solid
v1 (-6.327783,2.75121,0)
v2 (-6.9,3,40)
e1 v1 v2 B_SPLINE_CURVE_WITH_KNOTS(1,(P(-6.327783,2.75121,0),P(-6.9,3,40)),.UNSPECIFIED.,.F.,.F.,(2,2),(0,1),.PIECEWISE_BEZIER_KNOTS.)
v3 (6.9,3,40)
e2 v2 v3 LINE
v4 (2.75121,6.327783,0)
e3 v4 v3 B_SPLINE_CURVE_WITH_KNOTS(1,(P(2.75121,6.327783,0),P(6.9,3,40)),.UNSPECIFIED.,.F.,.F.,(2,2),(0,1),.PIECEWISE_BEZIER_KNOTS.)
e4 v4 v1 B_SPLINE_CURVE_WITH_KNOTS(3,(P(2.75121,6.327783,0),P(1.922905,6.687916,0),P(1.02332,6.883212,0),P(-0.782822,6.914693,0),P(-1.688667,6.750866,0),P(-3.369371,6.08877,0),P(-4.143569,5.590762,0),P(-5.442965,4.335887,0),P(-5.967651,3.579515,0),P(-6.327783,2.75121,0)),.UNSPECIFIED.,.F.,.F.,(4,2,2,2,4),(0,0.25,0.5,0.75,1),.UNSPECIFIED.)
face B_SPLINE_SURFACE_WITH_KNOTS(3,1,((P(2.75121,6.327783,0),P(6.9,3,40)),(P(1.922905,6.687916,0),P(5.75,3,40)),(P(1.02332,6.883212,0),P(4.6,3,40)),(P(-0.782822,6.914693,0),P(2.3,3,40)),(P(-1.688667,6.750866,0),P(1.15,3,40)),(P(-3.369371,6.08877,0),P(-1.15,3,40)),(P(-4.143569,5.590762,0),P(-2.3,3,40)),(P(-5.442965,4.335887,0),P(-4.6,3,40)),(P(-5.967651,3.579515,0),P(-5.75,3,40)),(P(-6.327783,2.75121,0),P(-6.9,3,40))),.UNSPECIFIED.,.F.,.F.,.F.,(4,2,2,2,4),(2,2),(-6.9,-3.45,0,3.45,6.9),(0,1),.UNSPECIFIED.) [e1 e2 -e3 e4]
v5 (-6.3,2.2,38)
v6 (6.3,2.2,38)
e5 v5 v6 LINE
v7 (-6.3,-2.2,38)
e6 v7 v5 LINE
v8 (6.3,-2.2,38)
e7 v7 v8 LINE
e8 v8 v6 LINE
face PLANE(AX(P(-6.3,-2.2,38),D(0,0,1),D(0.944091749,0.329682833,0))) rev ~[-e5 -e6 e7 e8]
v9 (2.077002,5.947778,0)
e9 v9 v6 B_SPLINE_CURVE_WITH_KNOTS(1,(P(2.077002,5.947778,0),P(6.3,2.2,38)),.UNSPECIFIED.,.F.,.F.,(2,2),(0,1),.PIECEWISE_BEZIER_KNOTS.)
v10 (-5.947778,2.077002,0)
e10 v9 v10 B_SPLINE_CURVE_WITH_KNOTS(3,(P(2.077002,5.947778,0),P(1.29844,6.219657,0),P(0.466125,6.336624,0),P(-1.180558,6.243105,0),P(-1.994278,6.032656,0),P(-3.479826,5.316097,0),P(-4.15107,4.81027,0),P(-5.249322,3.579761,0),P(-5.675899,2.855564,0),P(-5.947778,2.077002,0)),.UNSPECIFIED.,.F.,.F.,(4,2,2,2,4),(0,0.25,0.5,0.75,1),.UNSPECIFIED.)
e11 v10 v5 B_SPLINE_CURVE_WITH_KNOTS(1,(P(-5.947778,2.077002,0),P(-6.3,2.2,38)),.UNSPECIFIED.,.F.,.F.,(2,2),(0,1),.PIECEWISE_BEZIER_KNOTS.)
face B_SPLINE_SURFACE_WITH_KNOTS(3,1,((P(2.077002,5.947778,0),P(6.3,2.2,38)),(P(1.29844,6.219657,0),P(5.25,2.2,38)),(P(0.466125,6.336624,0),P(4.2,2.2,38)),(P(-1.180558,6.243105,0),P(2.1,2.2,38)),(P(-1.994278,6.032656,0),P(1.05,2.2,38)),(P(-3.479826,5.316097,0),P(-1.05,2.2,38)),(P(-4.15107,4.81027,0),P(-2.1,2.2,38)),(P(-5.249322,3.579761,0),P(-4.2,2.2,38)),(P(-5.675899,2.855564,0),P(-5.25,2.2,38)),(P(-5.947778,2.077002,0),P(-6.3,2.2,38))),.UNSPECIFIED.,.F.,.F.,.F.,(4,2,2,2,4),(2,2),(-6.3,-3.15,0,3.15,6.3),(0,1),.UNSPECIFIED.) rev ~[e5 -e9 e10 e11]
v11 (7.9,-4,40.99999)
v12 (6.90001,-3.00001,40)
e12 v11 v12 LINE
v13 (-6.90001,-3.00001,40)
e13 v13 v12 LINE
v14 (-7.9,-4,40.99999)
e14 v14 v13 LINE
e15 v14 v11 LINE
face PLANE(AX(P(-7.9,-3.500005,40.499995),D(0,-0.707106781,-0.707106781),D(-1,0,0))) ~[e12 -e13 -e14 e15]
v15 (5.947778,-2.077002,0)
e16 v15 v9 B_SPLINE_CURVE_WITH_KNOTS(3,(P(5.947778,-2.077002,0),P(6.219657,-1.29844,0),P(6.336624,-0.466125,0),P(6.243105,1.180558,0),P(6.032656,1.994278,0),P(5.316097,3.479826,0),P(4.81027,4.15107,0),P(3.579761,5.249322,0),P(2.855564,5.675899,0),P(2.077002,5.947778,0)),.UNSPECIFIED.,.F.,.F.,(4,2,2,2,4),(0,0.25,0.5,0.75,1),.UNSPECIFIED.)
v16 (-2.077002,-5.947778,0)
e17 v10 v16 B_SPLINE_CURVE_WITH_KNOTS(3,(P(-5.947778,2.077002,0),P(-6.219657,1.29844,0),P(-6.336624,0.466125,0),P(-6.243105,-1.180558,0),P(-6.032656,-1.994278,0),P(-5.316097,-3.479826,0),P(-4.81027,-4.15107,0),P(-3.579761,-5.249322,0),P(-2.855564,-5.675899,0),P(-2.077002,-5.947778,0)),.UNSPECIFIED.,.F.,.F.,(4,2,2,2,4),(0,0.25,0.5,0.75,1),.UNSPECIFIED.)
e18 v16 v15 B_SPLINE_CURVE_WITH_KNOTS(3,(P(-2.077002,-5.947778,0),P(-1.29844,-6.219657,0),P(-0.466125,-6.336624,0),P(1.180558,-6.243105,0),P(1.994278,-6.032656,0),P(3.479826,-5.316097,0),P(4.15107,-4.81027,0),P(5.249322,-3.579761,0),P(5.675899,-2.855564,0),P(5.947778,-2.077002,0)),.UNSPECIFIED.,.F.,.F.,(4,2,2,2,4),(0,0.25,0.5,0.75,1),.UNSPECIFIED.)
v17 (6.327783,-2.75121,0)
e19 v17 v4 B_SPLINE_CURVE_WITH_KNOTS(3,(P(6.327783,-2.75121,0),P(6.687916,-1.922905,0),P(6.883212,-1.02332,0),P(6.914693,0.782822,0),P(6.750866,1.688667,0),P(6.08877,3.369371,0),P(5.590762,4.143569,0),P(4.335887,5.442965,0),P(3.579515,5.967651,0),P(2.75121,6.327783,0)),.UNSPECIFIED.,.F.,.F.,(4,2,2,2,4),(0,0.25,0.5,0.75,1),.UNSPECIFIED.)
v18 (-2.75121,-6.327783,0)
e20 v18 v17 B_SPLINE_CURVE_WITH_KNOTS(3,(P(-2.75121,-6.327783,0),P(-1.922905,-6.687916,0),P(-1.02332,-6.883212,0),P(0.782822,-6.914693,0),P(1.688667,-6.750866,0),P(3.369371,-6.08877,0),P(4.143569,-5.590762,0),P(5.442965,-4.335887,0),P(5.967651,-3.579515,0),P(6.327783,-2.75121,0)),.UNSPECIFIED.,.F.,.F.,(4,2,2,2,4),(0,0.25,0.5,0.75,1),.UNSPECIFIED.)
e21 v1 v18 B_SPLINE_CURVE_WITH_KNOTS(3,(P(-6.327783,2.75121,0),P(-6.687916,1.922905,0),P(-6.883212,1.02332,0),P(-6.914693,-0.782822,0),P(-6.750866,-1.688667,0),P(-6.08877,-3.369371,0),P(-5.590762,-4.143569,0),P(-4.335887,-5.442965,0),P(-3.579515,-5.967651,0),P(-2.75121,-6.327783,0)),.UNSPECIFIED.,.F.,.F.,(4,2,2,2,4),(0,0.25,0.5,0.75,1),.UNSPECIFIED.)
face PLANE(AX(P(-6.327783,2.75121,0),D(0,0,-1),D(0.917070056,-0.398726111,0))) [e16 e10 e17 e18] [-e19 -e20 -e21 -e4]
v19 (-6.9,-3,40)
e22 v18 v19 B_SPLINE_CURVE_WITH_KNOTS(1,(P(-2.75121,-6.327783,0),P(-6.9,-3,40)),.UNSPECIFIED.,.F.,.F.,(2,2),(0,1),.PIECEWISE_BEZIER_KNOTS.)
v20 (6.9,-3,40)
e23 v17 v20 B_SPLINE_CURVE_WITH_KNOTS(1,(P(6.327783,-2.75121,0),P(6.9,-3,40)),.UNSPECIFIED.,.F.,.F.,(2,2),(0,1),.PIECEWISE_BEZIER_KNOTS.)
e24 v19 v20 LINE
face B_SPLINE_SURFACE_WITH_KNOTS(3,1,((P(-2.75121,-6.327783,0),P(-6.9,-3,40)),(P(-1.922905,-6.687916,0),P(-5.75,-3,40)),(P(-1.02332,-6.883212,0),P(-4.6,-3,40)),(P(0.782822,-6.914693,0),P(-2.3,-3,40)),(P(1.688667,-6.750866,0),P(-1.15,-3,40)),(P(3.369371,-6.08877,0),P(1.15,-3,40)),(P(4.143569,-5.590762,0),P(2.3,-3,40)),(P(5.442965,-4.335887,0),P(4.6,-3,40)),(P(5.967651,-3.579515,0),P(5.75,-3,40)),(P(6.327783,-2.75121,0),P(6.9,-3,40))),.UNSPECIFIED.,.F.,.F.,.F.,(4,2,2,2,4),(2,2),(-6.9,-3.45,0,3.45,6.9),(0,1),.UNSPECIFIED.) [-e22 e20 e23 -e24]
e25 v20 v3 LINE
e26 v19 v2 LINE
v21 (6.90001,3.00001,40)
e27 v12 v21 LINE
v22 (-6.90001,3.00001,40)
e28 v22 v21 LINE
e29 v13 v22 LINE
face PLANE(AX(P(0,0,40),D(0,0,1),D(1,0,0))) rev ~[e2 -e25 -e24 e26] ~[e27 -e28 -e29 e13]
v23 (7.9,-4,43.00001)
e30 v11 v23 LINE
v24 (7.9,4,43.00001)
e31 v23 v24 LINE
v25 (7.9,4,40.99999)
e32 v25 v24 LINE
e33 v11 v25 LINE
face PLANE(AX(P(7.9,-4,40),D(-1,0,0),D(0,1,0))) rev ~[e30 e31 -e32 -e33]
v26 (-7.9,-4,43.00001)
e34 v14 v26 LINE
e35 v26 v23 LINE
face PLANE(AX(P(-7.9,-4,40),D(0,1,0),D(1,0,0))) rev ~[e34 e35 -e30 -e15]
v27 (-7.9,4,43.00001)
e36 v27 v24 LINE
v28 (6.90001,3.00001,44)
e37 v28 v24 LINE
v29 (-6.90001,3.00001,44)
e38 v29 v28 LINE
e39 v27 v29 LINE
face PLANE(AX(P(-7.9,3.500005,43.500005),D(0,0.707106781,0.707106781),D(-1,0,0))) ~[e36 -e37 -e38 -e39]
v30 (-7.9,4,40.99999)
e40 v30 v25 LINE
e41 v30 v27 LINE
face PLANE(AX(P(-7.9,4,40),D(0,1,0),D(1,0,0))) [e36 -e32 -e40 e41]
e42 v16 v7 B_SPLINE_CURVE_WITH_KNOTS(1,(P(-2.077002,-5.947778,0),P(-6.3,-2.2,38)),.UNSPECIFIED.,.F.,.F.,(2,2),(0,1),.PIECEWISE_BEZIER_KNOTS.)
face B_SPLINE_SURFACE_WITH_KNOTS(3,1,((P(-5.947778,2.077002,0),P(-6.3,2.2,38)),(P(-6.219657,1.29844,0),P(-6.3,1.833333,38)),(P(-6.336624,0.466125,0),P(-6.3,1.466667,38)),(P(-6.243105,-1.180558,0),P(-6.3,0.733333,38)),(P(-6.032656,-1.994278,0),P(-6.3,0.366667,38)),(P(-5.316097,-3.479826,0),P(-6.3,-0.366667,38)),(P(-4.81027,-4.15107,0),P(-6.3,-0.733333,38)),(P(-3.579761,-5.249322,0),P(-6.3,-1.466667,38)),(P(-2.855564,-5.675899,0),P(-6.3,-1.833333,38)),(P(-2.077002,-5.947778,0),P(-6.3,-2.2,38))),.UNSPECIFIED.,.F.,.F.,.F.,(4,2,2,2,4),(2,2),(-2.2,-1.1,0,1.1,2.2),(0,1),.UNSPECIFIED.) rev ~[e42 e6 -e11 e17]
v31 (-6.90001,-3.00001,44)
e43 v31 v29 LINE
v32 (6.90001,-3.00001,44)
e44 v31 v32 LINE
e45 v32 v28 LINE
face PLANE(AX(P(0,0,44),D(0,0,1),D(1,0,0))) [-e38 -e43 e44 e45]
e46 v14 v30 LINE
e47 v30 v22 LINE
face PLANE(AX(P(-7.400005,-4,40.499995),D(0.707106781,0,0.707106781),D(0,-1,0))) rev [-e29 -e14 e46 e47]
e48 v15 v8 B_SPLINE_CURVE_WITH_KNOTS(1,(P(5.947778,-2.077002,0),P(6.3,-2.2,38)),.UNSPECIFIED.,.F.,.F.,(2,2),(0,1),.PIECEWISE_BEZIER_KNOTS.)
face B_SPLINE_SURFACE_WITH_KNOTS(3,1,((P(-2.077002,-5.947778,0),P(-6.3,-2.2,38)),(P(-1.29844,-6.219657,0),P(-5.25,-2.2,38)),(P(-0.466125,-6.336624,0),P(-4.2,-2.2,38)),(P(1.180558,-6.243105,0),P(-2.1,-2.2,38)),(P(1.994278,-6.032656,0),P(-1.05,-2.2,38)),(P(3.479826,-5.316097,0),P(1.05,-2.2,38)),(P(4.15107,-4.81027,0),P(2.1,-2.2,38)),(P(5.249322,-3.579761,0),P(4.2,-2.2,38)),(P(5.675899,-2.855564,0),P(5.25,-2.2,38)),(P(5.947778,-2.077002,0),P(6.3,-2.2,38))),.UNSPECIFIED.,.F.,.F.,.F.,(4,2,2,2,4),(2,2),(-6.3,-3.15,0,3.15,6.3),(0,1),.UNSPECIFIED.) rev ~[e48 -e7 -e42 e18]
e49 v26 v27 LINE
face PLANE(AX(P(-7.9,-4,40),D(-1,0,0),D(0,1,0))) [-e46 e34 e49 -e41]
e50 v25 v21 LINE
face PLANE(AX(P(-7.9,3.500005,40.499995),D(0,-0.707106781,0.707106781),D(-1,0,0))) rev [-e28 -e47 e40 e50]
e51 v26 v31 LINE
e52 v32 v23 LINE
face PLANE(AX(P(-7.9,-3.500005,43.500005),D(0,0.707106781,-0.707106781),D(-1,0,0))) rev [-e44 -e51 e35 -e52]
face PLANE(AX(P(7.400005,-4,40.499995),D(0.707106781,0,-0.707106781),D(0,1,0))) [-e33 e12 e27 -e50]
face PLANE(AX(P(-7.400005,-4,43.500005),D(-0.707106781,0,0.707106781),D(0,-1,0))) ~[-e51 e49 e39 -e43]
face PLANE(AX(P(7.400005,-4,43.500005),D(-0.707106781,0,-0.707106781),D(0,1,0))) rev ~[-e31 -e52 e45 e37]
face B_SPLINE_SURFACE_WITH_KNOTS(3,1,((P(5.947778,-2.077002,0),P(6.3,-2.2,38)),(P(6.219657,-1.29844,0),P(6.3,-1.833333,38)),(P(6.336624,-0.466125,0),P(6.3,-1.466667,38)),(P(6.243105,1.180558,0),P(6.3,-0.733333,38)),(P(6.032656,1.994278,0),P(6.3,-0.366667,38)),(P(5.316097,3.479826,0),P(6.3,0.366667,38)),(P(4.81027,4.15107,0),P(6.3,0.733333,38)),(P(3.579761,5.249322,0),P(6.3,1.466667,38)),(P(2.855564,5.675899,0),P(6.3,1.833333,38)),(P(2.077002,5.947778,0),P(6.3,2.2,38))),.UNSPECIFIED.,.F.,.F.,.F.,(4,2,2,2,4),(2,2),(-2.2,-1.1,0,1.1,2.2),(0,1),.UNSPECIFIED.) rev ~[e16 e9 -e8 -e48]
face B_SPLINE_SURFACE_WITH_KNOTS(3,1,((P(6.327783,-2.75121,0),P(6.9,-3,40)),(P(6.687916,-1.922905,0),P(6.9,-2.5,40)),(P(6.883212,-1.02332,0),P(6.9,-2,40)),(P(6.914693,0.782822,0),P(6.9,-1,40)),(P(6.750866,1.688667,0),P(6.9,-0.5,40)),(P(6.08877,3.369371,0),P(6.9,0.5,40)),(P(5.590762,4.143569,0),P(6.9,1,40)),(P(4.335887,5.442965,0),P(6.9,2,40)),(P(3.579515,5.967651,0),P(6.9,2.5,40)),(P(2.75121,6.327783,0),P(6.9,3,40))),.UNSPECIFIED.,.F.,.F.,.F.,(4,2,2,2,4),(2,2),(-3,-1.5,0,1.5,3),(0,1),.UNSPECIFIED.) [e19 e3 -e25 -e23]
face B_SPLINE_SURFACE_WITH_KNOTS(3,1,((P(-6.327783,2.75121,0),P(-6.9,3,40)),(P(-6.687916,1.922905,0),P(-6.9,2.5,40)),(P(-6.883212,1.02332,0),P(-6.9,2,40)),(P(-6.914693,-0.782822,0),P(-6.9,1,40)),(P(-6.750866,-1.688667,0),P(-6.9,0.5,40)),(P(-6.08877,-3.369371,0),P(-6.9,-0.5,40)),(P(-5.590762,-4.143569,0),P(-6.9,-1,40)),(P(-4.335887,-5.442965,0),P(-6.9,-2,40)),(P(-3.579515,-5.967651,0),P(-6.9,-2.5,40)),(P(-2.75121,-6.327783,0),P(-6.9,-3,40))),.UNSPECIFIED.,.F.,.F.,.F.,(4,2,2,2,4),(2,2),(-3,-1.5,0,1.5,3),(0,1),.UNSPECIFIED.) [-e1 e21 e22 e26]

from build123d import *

# Parameters (mm, degrees)
F2_W     = 13.8
F2_H     = 6
F6_W     = 12.6
F6_H     = 4.4
F8_W     = 15.8
F8_H     = 8
F9_DEPTH = 4
F10_SIZE = 0.99999


# Not quite as in the source:
# - a fillet or chamfer is up to 0.001 mm smaller than in the source, because OpenCascade refuses the exact size
# - the arcs of a loft's sections are written as splines that run evenly, so that the points pair up as in the source's solid


with BuildPart() as f3:
    # F0 (on Top) → F3 section 0
    with BuildSketch(Plane.XY):
        with BuildLine():
            add(Edge.make_bspline(
                [(-6.3277833881, 2.7512101688), (-6.6879159571, 1.9229052602), (-6.883211565, 1.0233196176), (-6.914692653, -0.782821821), (-6.7508657466, -1.6886669775), (-6.0887700743, -3.3693713762), (-5.5907618149, -4.143569333), (-4.3358874467, -5.4429646828), (-3.5795150773, -5.9676508192), (-2.7512101688, -6.3277833881)],
                knots=[0, 0, 0, 0, 0.25, 0.25, 0.5, 0.5, 0.75, 0.75, 1, 1, 1, 1], degree=3))
            add(Edge.make_bspline(
                [(-2.7512101688, -6.3277833881), (-1.9229052602, -6.6879159571), (-1.0233196176, -6.883211565), (0.782821821, -6.914692653), (1.6886669775, -6.7508657466), (3.3693713762, -6.0887700743), (4.143569333, -5.5907618149), (5.4429646828, -4.3358874467), (5.9676508192, -3.5795150773), (6.3277833881, -2.7512101688)],
                knots=[0, 0, 0, 0, 0.25, 0.25, 0.5, 0.5, 0.75, 0.75, 1, 1, 1, 1], degree=3))
            add(Edge.make_bspline(
                [(6.3277833881, -2.7512101688), (6.6879159571, -1.9229052602), (6.883211565, -1.0233196176), (6.914692653, 0.782821821), (6.7508657466, 1.6886669775), (6.0887700743, 3.3693713762), (5.5907618149, 4.143569333), (4.3358874467, 5.4429646828), (3.5795150773, 5.9676508192), (2.7512101688, 6.3277833881)],
                knots=[0, 0, 0, 0, 0.25, 0.25, 0.5, 0.5, 0.75, 0.75, 1, 1, 1, 1], degree=3))
            add(Edge.make_bspline(
                [(2.7512101688, 6.3277833881), (1.9229052602, 6.6879159571), (1.0233196176, 6.883211565), (-0.782821821, 6.914692653), (-1.6886669775, 6.7508657466), (-3.3693713762, 6.0887700743), (-4.143569333, 5.5907618149), (-5.4429646828, 4.3358874467), (-5.9676508192, 3.5795150773), (-6.3277833881, 2.7512101688)],
                knots=[0, 0, 0, 0, 0.25, 0.25, 0.5, 0.5, 0.75, 0.75, 1, 1, 1, 1], degree=3))
        make_face()
    # F2 (on offset) → F3 section 1
    with BuildSketch(Plane.XY.offset(40)):
        Rectangle(F2_W, F2_H)
    loft(ruled=True)

    # F5 (on Top) → F7 section 0
    with BuildSketch(Plane.XY):
        with BuildLine():
            add(Edge.make_bspline(
                [(-5.947778016, 2.0770018469), (-6.219656922, 1.2984395252), (-6.3366241137, 0.4661247359), (-6.2431050237, -1.1805579575), (-6.0326555377, -1.9942779624), (-5.3160969794, -3.479826193), (-4.8102698423, -4.151069919), (-3.5797613606, -5.2493224353), (-2.8555641686, -5.6758991101), (-2.0770018469, -5.947778016)],
                knots=[0, 0, 0, 0, 0.25, 0.25, 0.5, 0.5, 0.75, 0.75, 1, 1, 1, 1], degree=3))
            add(Edge.make_bspline(
                [(-2.0770018469, -5.947778016), (-1.2984395252, -6.219656922), (-0.4661247359, -6.3366241137), (1.1805579575, -6.2431050237), (1.9942779624, -6.0326555377), (3.479826193, -5.3160969794), (4.151069919, -4.8102698423), (5.2493224353, -3.5797613606), (5.6758991101, -2.8555641686), (5.947778016, -2.0770018469)],
                knots=[0, 0, 0, 0, 0.25, 0.25, 0.5, 0.5, 0.75, 0.75, 1, 1, 1, 1], degree=3))
            add(Edge.make_bspline(
                [(5.947778016, -2.0770018469), (6.219656922, -1.2984395252), (6.3366241137, -0.4661247359), (6.2431050237, 1.1805579575), (6.0326555377, 1.9942779624), (5.3160969794, 3.479826193), (4.8102698423, 4.151069919), (3.5797613606, 5.2493224353), (2.8555641686, 5.6758991101), (2.0770018469, 5.947778016)],
                knots=[0, 0, 0, 0, 0.25, 0.25, 0.5, 0.5, 0.75, 0.75, 1, 1, 1, 1], degree=3))
            add(Edge.make_bspline(
                [(2.0770018469, 5.947778016), (1.2984395252, 6.219656922), (0.4661247359, 6.3366241137), (-1.1805579575, 6.2431050237), (-1.9942779624, 6.0326555377), (-3.479826193, 5.3160969794), (-4.151069919, 4.8102698423), (-5.2493224353, 3.5797613606), (-5.6758991101, 2.8555641686), (-5.947778016, 2.0770018469)],
                knots=[0, 0, 0, 0, 0.25, 0.25, 0.5, 0.5, 0.75, 0.75, 1, 1, 1, 1], degree=3))
        make_face()
    # F6 (on offset) → F7 section 1
    with BuildSketch(Plane.XY.offset(38)):
        Rectangle(F6_W, F6_H)
    loft(ruled=True, mode=Mode.SUBTRACT)

    # F8 (on offset) → F9 (join)
    with BuildSketch(Plane.XY.offset(40)):
        Rectangle(F8_W, F8_H)
    extrude(amount=F9_DEPTH)

    # F10 (size 1 in the source; OpenCascade refuses exactly that, so slightly less here)
    f10_edges = [f3.edges().sort_by_distance(p)[0] for p in [
        (7.9, 0, 44),
        (0, -4, 44),
        (0, 4, 44),
        (-7.9, 0, 44),
        (0, -4, 40),
        (-7.9, 0, 40),
        (0, 4, 40),
        (7.9, 0, 40),
    ]]
    chamfer(f10_edges, length=F10_SIZE)


solid = f3.part
